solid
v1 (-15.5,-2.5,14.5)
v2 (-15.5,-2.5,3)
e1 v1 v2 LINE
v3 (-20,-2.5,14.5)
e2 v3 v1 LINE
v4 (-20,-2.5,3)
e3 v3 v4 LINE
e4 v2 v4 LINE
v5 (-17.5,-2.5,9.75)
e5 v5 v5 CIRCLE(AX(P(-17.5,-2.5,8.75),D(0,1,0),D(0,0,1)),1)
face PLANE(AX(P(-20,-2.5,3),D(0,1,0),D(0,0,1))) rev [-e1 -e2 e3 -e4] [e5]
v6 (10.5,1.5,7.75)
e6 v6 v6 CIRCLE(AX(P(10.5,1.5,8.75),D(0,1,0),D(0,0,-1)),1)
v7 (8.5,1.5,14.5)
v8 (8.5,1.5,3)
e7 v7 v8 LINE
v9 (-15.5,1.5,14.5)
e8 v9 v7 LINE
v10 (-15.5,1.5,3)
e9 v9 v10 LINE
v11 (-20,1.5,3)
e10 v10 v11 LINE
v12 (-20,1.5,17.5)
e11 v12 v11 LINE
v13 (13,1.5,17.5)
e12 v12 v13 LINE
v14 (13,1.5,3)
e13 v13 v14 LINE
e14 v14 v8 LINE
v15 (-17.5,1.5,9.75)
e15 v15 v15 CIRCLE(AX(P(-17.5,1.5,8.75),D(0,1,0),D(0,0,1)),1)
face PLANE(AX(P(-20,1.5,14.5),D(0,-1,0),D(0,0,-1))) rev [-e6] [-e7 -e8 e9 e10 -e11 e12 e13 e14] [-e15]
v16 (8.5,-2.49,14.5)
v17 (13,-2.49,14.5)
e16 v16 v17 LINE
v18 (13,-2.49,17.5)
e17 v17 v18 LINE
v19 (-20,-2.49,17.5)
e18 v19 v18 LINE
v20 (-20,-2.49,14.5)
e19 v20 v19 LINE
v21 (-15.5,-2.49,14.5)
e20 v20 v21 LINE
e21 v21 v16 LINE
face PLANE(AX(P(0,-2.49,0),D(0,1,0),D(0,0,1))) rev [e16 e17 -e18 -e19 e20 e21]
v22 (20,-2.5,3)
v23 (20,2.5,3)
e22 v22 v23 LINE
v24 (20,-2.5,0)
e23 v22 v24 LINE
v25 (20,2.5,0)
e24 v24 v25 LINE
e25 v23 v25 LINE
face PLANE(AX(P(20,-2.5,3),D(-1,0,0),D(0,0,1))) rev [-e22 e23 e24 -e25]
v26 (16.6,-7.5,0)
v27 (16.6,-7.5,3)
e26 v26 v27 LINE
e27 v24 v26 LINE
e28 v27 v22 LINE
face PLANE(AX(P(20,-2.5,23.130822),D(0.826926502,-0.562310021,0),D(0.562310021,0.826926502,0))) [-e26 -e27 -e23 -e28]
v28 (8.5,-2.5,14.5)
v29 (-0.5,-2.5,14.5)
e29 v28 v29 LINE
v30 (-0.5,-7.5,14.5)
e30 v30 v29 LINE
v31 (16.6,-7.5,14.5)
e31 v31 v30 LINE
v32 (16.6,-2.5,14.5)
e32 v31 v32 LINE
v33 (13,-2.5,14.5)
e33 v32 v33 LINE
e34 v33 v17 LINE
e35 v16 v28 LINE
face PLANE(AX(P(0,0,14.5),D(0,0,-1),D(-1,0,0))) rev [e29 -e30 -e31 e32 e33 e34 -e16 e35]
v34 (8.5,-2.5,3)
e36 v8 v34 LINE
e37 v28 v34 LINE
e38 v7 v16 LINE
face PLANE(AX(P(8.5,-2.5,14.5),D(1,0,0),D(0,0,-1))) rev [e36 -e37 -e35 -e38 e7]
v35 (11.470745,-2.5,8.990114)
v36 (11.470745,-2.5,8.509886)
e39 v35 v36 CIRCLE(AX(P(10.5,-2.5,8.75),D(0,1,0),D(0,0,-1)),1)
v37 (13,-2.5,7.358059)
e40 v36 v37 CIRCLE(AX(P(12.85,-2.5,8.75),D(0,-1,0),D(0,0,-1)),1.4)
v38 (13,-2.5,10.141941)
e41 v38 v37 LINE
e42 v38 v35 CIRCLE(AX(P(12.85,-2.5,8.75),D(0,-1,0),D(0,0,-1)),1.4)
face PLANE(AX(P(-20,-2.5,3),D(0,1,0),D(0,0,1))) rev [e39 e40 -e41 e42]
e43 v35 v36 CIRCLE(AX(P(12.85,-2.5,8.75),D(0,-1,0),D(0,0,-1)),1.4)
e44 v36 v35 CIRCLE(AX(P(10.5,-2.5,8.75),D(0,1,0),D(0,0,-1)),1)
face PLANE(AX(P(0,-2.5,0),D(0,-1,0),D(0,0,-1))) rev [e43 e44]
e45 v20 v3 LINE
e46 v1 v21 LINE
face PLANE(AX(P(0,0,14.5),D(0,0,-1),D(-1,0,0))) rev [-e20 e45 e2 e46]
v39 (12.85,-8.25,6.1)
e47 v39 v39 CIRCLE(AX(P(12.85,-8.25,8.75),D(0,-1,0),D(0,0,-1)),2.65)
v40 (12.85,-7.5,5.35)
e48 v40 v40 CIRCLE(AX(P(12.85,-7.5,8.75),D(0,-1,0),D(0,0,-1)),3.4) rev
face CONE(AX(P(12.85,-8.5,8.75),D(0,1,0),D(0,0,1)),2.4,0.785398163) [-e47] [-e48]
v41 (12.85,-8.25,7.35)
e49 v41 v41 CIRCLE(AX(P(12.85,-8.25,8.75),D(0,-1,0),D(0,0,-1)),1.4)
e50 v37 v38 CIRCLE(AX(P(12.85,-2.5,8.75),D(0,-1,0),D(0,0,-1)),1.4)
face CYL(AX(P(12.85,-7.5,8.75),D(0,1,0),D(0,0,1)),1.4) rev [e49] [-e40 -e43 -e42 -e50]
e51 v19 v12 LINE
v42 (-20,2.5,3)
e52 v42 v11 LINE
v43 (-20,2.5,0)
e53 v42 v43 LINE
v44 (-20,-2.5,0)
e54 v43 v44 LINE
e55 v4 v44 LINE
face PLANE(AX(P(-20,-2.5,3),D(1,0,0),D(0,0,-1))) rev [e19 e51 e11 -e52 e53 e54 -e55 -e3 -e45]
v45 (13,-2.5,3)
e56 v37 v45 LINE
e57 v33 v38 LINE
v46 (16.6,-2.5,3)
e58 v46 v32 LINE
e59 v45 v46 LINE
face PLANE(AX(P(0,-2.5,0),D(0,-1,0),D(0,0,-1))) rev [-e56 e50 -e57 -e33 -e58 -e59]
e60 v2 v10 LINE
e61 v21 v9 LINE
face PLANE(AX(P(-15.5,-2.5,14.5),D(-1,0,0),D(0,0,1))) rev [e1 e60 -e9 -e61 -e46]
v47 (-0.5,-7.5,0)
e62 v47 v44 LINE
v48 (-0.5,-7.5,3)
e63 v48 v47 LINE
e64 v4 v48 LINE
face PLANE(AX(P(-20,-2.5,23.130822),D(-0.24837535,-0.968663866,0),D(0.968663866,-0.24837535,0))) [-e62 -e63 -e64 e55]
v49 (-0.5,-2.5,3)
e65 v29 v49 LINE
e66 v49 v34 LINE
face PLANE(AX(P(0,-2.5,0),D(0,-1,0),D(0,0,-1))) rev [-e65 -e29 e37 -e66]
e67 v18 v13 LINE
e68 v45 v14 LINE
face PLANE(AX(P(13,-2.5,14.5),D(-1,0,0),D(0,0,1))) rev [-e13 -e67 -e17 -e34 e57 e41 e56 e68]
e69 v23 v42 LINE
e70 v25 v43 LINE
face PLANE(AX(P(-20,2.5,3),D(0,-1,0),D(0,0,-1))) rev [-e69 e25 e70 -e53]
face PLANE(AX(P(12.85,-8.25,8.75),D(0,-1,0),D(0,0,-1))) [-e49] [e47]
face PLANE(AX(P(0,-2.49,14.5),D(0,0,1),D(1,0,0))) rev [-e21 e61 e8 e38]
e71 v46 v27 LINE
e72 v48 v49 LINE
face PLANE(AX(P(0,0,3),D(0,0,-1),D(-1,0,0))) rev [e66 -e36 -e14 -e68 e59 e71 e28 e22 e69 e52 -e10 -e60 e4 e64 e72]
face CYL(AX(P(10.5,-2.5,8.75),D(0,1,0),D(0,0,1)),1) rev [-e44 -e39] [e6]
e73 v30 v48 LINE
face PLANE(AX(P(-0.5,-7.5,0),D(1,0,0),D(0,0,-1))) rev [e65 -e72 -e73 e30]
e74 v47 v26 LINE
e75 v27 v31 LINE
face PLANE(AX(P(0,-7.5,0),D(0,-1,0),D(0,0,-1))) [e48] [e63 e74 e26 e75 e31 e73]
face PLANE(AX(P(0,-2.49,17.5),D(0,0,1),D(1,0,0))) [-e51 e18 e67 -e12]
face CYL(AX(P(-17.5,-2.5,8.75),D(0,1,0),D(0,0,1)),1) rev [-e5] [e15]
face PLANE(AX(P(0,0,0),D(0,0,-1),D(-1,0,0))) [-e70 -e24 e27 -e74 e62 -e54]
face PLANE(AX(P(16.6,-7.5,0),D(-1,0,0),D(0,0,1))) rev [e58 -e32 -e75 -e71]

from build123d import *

# Parameters (mm, degrees)
SKETCH_1_W          = 40
SKETCH_1_H          = 5
EXTRUDE_1_DEPTH     = 3
SKETCH_2_W          = 4.5
SKETCH_2_H          = 4
EXTRUDE_2_DEPTH     = 11.5
SKETCH_4_R          = 1
CUT_EXTRUDE_1_DEPTH = 26.024987512
SKETCH_5_W          = 17.1
SKETCH_5_H          = 14.5
SKETCH_5_R          = 1.4
EXTRUDE_3_DEPTH     = 5
EXTRUDE_4_DEPTH     = 3
SKETCH_7_R          = 2.4
SKETCH_7_R_2        = 1.4
EXTRUDE_5_DEPTH     = 0.75
CHAMFER_1_SIZE      = 1
EXTRUDE_11_DEPTH    = 3.99


with BuildPart() as part:
    # Эскиз1 → Бобышка-Вытянуть1 (new body)
    with BuildSketch(Plane.XY):
        Rectangle(SKETCH_1_W, SKETCH_1_H)
    extrude(amount=EXTRUDE_1_DEPTH)

    # Эскиз2 → Бобышка-Вытянуть2 (add)
    with BuildSketch(Plane.XY.offset(3)):
        with Locations((-17.75, -0.5)):
            Rectangle(SKETCH_2_W, SKETCH_2_H)
        with Locations((10.75, -0.5)):
            Rectangle(SKETCH_2_W, SKETCH_2_H)
    extrude(amount=EXTRUDE_2_DEPTH)

    # Эскиз4 → Вырез-Вытянуть1 (cut, through all)
    with BuildSketch(Plane(origin=(0, 1.5, 0), x_dir=(1, 0, 0), z_dir=(0, 1, 0))):
        with Locations(Location((-17.5, -8.75, 0), (0, 0, 270))):
            Circle(SKETCH_4_R)
        with Locations(Location((10.5, -8.75, 0), (0, 0, 90))):
            Circle(SKETCH_4_R)
    extrude(amount=-CUT_EXTRUDE_1_DEPTH, mode=Mode.SUBTRACT)

    # Эскиз5 → Бобышка-Вытянуть3 (add)
    with BuildSketch(Plane.XZ.offset(2.5)):
        with Locations((8.05, 7.25)):
            Rectangle(SKETCH_5_W, SKETCH_5_H)
        with Locations(Location((12.85, 8.75, 0), (0, 0, 83.849360172))):
            Circle(SKETCH_5_R, mode=Mode.SUBTRACT)
    extrude(amount=EXTRUDE_3_DEPTH)

    # Эскиз6 → Бобышка-Вытянуть4 (add)
    with BuildSketch(Plane(origin=(0, 0, 0), x_dir=(-1, 0, 0), z_dir=(0, 0, -1))):
        Polygon((-20, -2.5), (-16.6, -7.5), (-16.6, -2.5), align=None)
        Polygon((20, -2.5), (0.5, -7.5), (0.5, -2.5), align=None)
    extrude(amount=-EXTRUDE_4_DEPTH)

    # Эскиз7 → Бобышка-Вытянуть5 (add)
    with BuildSketch(Plane.XZ.offset(7.5)):
        with Locations(Location((12.85, 8.75, 0), (0, 0, 270))):
            Circle(SKETCH_7_R)
        with Locations(Location((12.85, 8.75, 0), (0, 0, 83.849360172))):
            Circle(SKETCH_7_R_2, mode=Mode.SUBTRACT)
    extrude(amount=EXTRUDE_5_DEPTH)

    # Фаска1
    # the kernel refuses this chamfer: 1 mm, written as the material it adds along each edge
    with BuildSketch(Plane(origin=(12.85, -7.5, 8.75), x_dir=(0, 0, -1), z_dir=(-1, 0, 0))) as chamfer_1_piece_1_section:
        Polygon((2.4 + CHAMFER_1_SIZE, 0), (2.4, CHAMFER_1_SIZE), (2.4, 0), align=None)
    chamfer_1_piece_1 = revolve(axis=Axis((12.85, -7.5, 8.75), (0, -1, 0)), mode=Mode.PRIVATE)
    chamfer_1_piece_1 = split(chamfer_1_piece_1, bisect_by=Plane(origin=(12.85, -8.25, 8.75), z_dir=(0, 1, 0)), keep=Keep.TOP, mode=Mode.PRIVATE)
    add(chamfer_1_piece_1)

    # Эскиз8 → Бобышка-Вытянуть11 (add)
    with BuildSketch(Plane(origin=(0, 1.5, 0), x_dir=(1, 0, 0), z_dir=(0, 1, 0))):
        Polygon((-15.5, -14.5), (-20, -14.5), (-20, -17.5), (13, -17.5), (13, -14.5), align=None)
    extrude(amount=-EXTRUDE_11_DEPTH)


solid = part.part
